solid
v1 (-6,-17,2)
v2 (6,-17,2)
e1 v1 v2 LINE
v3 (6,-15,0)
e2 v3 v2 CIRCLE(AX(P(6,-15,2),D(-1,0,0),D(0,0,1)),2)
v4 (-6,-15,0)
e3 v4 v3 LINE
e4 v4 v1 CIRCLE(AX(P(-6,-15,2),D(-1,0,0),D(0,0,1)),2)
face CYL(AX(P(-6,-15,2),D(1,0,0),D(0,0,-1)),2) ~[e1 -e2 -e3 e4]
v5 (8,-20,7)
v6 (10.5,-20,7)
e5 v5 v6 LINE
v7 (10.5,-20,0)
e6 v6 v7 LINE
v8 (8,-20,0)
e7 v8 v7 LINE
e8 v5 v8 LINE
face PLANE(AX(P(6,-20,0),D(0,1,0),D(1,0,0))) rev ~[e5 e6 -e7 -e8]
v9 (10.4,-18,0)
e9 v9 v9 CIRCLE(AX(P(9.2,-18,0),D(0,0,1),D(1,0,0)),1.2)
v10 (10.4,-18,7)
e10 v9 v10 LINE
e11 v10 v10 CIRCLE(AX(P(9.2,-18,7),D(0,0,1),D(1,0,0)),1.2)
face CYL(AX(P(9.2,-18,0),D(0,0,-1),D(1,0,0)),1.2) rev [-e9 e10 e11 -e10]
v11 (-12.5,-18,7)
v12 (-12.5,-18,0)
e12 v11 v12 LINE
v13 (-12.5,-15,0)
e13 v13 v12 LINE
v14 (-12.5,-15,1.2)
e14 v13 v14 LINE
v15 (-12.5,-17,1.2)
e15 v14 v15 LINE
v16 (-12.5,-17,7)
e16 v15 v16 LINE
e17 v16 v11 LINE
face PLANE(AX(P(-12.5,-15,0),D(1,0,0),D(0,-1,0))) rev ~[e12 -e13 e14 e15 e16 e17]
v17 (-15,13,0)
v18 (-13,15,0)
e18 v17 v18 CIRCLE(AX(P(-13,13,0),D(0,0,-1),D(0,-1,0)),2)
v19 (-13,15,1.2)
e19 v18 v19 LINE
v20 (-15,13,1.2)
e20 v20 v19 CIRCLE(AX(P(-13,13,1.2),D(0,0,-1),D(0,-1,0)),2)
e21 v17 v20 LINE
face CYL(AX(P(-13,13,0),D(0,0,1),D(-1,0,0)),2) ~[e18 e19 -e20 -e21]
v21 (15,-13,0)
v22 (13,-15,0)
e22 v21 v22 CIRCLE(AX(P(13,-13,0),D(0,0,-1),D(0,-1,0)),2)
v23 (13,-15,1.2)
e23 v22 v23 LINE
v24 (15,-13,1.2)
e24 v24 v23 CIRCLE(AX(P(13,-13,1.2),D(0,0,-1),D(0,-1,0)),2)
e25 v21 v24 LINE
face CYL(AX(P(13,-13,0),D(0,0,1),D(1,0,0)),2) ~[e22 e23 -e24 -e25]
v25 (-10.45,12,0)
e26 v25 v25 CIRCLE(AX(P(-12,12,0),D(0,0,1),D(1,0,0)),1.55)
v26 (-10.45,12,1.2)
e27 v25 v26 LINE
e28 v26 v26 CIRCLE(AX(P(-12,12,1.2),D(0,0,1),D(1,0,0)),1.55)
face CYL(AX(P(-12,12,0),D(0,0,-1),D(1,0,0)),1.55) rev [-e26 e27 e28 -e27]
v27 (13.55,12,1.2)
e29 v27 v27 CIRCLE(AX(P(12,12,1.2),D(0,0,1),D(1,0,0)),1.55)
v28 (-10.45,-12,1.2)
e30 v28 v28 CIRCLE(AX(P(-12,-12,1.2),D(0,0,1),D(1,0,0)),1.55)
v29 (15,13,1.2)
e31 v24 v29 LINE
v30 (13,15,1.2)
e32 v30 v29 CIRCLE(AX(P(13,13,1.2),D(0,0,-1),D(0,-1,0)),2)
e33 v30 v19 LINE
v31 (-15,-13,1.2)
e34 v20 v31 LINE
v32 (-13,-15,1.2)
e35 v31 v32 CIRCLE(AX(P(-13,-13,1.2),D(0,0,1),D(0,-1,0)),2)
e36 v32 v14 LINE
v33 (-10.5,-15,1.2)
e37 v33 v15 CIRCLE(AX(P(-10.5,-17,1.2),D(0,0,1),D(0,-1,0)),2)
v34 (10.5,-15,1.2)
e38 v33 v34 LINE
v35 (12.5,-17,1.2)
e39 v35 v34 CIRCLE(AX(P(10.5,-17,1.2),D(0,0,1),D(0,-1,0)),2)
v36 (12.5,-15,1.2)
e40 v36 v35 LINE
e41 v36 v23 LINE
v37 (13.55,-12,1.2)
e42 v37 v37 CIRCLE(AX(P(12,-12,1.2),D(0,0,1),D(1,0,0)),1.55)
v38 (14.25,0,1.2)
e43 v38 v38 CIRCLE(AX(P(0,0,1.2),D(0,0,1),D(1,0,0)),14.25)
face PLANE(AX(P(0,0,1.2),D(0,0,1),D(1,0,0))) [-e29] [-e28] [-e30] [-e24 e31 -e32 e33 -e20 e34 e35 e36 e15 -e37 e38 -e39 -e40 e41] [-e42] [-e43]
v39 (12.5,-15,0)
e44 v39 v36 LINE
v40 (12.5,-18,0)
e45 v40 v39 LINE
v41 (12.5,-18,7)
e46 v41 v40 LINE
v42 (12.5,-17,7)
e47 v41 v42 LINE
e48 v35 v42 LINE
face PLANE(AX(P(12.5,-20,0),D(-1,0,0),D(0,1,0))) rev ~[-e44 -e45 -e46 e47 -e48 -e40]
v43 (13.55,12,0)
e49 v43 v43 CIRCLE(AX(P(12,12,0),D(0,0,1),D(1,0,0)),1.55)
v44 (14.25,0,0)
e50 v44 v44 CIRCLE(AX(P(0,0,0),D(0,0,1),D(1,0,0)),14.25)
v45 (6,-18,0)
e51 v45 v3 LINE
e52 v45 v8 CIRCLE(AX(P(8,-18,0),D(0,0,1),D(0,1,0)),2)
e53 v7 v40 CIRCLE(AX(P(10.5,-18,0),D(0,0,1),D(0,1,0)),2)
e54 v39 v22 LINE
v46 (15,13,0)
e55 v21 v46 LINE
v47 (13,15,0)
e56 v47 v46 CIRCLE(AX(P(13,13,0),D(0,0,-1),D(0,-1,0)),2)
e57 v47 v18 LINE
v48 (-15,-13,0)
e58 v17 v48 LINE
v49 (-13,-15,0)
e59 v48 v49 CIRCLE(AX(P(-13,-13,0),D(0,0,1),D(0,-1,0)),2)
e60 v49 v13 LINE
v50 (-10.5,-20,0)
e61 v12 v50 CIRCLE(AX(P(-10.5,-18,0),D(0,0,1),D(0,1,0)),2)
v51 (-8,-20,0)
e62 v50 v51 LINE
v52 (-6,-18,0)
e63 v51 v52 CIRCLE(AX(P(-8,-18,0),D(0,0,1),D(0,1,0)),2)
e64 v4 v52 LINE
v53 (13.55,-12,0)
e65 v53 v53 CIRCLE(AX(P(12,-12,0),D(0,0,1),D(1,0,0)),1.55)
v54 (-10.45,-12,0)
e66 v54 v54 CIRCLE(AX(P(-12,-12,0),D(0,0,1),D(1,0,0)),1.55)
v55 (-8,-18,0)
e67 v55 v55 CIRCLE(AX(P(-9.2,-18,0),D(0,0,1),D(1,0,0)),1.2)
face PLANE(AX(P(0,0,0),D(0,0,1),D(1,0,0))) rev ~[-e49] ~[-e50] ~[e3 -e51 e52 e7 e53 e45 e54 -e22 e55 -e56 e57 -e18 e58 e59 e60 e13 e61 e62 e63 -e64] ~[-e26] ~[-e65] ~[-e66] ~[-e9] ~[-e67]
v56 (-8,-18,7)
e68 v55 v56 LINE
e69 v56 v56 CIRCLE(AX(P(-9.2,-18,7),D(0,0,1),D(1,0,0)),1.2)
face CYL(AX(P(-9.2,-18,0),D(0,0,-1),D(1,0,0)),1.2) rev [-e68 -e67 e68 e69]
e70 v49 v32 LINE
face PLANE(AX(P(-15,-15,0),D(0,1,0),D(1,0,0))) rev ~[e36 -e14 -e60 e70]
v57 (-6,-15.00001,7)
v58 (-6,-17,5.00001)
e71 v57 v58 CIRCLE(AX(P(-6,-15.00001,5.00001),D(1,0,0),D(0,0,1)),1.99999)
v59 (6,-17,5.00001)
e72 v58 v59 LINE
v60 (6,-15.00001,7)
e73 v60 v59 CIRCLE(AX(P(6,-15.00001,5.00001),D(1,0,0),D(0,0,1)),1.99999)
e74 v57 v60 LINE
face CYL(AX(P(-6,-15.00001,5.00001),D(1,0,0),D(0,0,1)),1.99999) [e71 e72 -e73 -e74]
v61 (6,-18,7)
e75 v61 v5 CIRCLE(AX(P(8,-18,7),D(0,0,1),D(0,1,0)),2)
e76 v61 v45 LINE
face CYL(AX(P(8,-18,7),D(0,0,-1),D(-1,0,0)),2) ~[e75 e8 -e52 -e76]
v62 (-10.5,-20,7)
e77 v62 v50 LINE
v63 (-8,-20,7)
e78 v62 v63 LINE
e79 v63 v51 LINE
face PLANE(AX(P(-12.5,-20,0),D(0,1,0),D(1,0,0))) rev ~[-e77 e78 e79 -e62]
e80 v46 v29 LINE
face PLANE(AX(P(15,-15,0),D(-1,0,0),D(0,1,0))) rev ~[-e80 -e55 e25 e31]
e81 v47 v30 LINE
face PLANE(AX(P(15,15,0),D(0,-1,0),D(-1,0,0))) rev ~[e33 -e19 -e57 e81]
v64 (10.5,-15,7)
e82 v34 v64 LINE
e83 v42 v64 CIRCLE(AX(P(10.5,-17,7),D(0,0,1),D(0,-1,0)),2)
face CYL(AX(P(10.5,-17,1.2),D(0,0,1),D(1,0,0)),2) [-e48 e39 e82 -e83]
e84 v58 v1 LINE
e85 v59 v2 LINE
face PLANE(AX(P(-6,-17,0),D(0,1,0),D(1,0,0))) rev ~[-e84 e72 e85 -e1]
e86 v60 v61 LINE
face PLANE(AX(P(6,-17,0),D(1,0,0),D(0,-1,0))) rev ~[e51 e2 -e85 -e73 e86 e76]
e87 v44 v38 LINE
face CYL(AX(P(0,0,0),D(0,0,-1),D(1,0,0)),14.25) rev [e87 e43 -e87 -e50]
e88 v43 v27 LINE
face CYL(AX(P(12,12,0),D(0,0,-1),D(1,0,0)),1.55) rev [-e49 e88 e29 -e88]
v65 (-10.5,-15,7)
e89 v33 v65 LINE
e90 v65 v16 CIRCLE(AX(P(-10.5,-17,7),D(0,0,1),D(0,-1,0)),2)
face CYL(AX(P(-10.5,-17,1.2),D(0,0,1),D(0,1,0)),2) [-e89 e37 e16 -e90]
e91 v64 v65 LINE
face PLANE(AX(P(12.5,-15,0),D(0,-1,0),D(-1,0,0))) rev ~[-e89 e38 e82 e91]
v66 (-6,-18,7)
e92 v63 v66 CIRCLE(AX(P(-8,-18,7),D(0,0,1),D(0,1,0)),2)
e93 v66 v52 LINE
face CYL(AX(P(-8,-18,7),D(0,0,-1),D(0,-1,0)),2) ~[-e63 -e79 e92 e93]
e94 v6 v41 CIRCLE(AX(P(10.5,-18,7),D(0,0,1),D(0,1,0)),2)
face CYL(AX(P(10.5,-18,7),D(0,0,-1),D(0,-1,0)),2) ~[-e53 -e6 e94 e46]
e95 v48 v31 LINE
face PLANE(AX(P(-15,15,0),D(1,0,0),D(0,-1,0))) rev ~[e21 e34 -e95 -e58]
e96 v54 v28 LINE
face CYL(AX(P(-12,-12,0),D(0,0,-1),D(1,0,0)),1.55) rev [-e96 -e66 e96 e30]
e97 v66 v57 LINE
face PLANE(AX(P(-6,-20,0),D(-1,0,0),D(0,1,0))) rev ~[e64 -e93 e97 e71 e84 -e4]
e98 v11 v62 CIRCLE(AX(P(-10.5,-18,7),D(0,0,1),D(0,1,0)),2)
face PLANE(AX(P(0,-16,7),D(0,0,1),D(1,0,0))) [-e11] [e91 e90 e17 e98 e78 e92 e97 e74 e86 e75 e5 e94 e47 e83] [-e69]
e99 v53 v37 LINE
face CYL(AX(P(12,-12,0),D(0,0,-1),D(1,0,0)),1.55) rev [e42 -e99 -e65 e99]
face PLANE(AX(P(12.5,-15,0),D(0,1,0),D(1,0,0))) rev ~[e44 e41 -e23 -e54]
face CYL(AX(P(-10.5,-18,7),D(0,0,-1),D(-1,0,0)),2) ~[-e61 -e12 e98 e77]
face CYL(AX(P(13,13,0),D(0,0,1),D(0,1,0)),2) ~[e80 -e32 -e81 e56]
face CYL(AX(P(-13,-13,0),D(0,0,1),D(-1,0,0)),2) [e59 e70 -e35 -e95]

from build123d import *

# Parameters (mm, degrees)
F0_R     = 1.55
F0_R_2   = 14.25
F0_R_3   = 1.2
F0_W     = 12
F0_H     = 2
F1_DEPTH = 1.2
F2_DEPTH = 7
F3_R     = 2
F3_R_2   = 1.99999


# Not quite as in the source:
# - a fillet or chamfer is up to 0.001 mm smaller than in the source, because OpenCascade refuses the exact size


with BuildPart() as f1:
    # F0 (on Top) → F1 (new body)
    with BuildSketch(Plane.XY):
        Polygon((12.5, -15), (15, -15), (15, 15), (-15, 15), (-15, -15), (-12.5, -15), (-6, -15), (6, -15), align=None)
        with Locations((-12, -12)):
            Circle(F0_R, mode=Mode.SUBTRACT)
        with Locations((12, -12)):
            Circle(F0_R, mode=Mode.SUBTRACT)
        with Locations((-12, 12)):
            Circle(F0_R, mode=Mode.SUBTRACT)
        Circle(F0_R_2, mode=Mode.SUBTRACT)
        with Locations((12, 12)):
            Circle(F0_R, mode=Mode.SUBTRACT)
        Polygon((-6, -17), (-6, -15), (-12.5, -15), (-12.5, -20), (-6, -20), align=None)
        with Locations((-9.2, -18)):
            Circle(F0_R_3, mode=Mode.SUBTRACT)
        with Locations((0, -16)):
            Rectangle(F0_W, F0_H)
        Polygon((12.5, -20), (12.5, -15), (6, -15), (6, -17), (6, -20), align=None)
        with Locations((9.2, -18)):
            Circle(F0_R_3, mode=Mode.SUBTRACT)
    extrude(amount=F1_DEPTH)

    # F0 (on Top) → F2 (join)
    with BuildSketch(Plane.XY):
        with Locations((0, -16)):
            Rectangle(F0_W, F0_H)
        Polygon((-6, -17), (-6, -15), (-12.5, -15), (-12.5, -20), (-6, -20), align=None)
        with Locations((-9.2, -18)):
            Circle(F0_R_3, mode=Mode.SUBTRACT)
        Polygon((12.5, -20), (12.5, -15), (6, -15), (6, -17), (6, -20), align=None)
        with Locations((9.2, -18)):
            Circle(F0_R_3, mode=Mode.SUBTRACT)
    extrude(amount=F2_DEPTH)

    # F3 (call 1 of 12: OpenCascade refuses the feature's edges together)
    f3_edges = [f1.edges().sort_by_distance(p)[0] for p in [
        (15, -15, 0.6),
    ]]
    fillet(f3_edges, radius=F3_R)

    # F3#2 (call 2 of 12)
    f3_2_edges = [f1.edges().sort_by_distance(p)[0] for p in [
        (-15, -15, 0.6),
    ]]
    fillet(f3_2_edges, radius=F3_R)

    # F3#3 (call 3 of 12)
    f3_3_edges = [f1.edges().sort_by_distance(p)[0] for p in [
        (-15, 15, 0.6),
    ]]
    fillet(f3_3_edges, radius=F3_R)

    # F3#4 (call 4 of 12)
    f3_4_edges = [f1.edges().sort_by_distance(p)[0] for p in [
        (15, 15, 0.6),
    ]]
    fillet(f3_4_edges, radius=F3_R)

    # F3#5 (call 5 of 12)
    f3_5_edges = [f1.edges().sort_by_distance(p)[0] for p in [
        (-12.5, -20, 3.5),
    ]]
    fillet(f3_5_edges, radius=F3_R)

    # F3#6 (call 6 of 12)
    f3_6_edges = [f1.edges().sort_by_distance(p)[0] for p in [
        (-6, -20, 3.5),
    ]]
    fillet(f3_6_edges, radius=F3_R)

    # F3#7 (call 7 of 12)
    f3_7_edges = [f1.edges().sort_by_distance(p)[0] for p in [
        (6, -20, 3.5),
    ]]
    fillet(f3_7_edges, radius=F3_R)

    # F3#8 (call 8 of 12)
    f3_8_edges = [f1.edges().sort_by_distance(p)[0] for p in [
        (12.5, -20, 3.5),
    ]]
    fillet(f3_8_edges, radius=F3_R)

    # F3#9 (call 9 of 12)
    f3_9_edges = [f1.edges().sort_by_distance(p)[0] for p in [
        (12.5, -15, 4.1),
    ]]
    fillet(f3_9_edges, radius=F3_R)

    # F3#10 (call 10 of 12)
    f3_10_edges = [f1.edges().sort_by_distance(p)[0] for p in [
        (-12.5, -15, 4.1),
    ]]
    fillet(f3_10_edges, radius=F3_R)

    # F3#11 (call 11 of 12) (radius 2 in the source; OpenCascade refuses exactly that, so slightly less here)
    f3_11_edges = [f1.edges().sort_by_distance(p)[0] for p in [
        (0, -17, 7),
    ]]
    fillet(f3_11_edges, radius=F3_R_2)

    # F3#12 (call 12 of 12)
    f3_12_edges = [f1.edges().sort_by_distance(p)[0] for p in [
        (0, -17, 0),
    ]]
    fillet(f3_12_edges, radius=F3_R)


solid = f1.part
